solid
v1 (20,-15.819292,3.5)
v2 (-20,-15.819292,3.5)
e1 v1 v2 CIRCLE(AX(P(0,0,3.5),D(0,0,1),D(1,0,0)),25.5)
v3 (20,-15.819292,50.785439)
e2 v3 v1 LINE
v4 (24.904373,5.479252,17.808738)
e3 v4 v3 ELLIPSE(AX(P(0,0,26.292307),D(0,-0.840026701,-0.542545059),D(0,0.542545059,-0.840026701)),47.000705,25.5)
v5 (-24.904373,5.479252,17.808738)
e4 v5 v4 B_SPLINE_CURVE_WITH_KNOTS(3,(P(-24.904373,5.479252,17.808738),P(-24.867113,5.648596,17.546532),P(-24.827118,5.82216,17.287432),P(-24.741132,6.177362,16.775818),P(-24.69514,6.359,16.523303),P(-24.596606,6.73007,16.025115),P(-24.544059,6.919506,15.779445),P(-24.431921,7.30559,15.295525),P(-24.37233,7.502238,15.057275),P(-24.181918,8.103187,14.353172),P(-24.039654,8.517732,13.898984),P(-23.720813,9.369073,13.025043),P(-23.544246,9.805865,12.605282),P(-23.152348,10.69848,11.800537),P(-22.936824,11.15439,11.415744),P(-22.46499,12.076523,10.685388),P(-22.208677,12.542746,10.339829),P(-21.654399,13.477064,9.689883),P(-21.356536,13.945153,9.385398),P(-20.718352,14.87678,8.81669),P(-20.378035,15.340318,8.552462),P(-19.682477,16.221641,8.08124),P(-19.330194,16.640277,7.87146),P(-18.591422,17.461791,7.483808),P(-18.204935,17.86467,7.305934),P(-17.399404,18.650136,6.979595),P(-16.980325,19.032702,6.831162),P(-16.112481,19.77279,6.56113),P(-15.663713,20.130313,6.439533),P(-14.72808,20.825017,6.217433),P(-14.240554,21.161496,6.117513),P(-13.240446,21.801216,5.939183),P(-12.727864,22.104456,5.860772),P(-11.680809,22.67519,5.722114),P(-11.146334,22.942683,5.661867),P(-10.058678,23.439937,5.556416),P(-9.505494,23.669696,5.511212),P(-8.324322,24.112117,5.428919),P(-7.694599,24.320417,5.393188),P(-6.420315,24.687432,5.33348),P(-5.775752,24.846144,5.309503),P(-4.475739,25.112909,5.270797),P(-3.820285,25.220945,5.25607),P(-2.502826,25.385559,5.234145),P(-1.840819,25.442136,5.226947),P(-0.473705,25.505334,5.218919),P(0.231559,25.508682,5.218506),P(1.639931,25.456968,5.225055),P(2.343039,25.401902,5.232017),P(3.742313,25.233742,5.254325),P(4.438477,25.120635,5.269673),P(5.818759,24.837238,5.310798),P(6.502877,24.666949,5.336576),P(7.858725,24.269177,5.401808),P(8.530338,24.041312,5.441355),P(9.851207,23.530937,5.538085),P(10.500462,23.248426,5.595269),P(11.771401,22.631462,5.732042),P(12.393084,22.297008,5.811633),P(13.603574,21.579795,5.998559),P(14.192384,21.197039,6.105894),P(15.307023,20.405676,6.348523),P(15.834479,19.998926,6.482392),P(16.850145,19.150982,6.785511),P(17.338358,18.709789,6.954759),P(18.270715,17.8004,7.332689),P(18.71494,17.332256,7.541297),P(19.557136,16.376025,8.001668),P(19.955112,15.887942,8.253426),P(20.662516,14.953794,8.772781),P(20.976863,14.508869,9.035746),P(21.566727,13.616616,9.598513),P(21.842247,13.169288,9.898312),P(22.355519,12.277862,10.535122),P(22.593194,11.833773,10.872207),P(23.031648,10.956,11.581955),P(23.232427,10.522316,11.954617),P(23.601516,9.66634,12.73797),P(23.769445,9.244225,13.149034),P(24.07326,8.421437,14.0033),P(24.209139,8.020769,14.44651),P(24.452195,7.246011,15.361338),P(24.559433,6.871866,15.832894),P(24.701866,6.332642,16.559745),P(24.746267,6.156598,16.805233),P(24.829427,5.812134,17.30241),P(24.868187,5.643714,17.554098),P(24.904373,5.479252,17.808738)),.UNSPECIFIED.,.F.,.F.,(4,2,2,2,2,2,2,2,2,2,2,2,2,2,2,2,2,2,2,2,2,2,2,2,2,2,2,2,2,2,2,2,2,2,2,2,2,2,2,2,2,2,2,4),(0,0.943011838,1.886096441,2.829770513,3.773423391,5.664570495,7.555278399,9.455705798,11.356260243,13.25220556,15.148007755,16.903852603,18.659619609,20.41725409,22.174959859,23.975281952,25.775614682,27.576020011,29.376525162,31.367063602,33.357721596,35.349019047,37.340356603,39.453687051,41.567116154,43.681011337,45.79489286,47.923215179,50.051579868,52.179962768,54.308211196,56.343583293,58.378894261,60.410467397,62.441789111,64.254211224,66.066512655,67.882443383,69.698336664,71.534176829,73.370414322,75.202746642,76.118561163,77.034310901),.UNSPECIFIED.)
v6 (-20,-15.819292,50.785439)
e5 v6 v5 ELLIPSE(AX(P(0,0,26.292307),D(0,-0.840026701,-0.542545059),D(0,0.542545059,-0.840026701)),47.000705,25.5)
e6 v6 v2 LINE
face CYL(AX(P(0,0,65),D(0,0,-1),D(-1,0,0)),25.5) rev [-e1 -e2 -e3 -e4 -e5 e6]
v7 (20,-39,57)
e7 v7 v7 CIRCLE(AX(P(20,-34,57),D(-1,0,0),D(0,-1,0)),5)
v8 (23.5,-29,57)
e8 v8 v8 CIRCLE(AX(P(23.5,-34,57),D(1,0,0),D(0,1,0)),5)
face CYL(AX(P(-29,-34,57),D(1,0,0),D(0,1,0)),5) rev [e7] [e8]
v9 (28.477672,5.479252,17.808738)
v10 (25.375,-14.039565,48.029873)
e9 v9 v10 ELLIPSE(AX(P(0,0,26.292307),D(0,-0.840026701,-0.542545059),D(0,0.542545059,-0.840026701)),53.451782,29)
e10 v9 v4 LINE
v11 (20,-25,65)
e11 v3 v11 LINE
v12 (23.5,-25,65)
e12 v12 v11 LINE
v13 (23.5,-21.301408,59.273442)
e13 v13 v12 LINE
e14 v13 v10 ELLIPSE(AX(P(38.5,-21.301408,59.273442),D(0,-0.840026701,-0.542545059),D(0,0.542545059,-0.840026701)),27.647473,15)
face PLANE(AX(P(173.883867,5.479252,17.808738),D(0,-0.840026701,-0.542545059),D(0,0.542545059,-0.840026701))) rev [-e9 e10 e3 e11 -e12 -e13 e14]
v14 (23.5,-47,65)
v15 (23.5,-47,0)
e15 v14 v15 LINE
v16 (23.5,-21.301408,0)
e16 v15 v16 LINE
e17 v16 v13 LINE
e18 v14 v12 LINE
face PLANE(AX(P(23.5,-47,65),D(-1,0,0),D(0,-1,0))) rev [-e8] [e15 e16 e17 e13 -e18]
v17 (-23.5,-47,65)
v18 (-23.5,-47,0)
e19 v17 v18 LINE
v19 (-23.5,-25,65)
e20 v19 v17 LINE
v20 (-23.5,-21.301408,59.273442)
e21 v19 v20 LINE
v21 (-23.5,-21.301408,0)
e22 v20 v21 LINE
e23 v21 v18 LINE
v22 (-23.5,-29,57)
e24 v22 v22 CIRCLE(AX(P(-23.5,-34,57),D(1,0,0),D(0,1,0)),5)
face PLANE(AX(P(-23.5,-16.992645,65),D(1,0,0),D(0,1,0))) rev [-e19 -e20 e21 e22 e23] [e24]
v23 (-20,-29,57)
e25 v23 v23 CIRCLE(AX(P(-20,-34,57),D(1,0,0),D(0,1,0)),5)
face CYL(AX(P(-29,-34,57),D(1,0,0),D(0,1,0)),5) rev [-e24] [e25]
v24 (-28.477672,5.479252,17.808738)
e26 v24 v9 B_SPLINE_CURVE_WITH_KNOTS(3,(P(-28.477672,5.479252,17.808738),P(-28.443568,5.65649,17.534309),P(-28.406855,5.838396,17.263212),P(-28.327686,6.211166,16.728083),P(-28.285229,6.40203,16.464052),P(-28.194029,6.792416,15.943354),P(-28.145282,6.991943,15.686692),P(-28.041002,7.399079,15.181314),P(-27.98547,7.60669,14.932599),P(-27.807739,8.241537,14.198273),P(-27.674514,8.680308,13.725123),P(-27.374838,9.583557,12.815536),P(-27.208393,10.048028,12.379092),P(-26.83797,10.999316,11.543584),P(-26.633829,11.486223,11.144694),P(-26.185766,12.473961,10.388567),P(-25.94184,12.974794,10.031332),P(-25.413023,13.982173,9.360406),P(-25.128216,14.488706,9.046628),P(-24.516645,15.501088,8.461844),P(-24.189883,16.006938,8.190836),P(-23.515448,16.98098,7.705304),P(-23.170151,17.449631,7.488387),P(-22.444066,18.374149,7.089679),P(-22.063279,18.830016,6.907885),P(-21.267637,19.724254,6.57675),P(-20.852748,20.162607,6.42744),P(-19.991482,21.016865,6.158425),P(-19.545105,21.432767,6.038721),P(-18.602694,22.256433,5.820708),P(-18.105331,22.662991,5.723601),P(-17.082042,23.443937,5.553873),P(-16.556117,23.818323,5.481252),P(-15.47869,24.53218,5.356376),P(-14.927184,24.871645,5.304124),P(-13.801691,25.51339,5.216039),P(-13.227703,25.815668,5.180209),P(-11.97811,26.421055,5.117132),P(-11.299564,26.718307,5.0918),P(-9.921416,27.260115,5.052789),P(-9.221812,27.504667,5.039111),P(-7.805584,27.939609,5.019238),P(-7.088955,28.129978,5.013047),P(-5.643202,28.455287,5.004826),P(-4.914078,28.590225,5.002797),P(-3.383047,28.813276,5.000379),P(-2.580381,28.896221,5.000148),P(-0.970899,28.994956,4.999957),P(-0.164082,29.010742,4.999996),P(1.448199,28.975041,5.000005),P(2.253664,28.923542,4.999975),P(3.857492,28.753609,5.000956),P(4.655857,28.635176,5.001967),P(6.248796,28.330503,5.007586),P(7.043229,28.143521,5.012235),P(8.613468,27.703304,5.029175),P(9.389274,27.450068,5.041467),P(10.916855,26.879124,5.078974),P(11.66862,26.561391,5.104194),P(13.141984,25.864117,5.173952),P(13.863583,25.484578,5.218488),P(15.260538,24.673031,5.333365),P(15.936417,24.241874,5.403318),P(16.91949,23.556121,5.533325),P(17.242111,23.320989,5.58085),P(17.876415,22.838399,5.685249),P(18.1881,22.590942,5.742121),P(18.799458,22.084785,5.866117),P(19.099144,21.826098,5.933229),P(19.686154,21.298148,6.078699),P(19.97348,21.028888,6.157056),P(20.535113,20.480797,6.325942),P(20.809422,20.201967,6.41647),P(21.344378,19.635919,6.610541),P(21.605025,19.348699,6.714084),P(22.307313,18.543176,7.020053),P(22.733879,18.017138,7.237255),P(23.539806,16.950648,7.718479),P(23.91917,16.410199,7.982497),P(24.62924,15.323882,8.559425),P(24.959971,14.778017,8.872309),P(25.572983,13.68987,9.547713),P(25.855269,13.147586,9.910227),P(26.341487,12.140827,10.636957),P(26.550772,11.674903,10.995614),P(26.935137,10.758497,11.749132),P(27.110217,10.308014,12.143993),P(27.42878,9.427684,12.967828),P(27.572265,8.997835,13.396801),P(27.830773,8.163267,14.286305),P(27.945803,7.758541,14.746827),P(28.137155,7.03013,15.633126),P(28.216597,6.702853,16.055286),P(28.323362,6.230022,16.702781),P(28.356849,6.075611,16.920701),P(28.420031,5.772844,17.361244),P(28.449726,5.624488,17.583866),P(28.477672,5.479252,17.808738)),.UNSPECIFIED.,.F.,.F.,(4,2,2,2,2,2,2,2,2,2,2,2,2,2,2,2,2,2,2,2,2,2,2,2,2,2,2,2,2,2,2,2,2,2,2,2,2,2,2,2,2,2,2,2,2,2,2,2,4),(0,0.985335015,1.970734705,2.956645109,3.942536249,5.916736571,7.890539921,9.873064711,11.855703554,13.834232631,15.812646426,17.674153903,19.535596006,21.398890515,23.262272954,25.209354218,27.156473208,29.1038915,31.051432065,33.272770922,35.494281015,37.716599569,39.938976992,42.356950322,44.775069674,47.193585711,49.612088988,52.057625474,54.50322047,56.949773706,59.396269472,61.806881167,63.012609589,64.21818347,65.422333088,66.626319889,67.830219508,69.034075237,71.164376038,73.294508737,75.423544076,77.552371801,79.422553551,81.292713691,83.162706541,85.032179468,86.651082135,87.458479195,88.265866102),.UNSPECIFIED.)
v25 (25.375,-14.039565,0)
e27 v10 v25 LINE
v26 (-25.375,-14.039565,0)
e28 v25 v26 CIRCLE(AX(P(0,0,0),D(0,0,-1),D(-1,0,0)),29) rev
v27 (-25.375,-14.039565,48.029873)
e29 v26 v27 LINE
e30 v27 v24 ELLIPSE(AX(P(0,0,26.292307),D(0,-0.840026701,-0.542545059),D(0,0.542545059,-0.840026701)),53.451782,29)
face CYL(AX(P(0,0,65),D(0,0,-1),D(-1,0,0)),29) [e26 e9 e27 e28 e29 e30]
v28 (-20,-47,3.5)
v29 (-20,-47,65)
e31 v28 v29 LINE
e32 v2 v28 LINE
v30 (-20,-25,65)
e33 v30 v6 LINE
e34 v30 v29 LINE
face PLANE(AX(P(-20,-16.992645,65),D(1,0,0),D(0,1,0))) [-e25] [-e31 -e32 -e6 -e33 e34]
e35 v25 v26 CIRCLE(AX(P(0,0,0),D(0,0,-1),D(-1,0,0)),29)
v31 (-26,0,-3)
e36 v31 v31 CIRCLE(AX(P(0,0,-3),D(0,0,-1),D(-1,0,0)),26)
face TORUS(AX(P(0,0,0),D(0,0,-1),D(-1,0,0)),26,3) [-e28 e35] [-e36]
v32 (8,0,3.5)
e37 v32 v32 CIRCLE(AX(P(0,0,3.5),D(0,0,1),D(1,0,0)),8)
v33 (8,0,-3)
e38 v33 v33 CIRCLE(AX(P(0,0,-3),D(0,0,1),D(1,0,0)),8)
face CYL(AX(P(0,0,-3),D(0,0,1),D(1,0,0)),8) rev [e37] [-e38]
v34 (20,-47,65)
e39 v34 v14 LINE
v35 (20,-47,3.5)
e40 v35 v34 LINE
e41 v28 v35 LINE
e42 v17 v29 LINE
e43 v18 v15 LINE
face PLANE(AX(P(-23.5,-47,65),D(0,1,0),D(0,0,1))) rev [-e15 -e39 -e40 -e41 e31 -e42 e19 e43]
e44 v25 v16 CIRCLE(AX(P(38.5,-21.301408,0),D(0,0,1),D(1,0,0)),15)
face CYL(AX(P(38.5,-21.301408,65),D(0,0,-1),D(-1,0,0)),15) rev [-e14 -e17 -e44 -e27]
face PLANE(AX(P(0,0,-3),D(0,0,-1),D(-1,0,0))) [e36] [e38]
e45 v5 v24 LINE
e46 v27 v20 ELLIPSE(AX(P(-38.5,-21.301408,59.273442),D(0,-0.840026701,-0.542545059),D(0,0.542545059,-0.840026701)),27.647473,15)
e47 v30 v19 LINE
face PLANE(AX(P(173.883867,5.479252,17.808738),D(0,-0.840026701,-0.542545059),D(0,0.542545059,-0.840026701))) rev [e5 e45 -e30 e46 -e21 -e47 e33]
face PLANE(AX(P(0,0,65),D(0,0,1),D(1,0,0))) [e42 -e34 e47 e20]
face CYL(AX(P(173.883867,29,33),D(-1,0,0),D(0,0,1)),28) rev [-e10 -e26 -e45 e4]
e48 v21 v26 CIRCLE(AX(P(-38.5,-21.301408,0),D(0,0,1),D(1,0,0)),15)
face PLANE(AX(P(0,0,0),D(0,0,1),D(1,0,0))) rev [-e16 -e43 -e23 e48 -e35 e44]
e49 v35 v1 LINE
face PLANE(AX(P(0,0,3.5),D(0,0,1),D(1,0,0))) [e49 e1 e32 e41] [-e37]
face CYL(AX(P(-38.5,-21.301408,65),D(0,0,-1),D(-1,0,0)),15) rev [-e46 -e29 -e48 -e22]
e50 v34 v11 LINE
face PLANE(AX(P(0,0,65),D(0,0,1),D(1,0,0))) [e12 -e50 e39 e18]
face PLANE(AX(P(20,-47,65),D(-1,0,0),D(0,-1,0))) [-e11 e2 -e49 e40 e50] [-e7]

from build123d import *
from build123d.topology import SkipClean

# Parameters (mm, degrees)
EXTRUDE_1_DEPTH          = 65
SHELL_1_T                = -3.5
CUT_EXTRUDE_3_DEPTH      = 86.293611
CUT_EXTRUDE_3_DEPTH_BACK = 86.293611
FILLET_1_R               = 15
SKETCH_3_W               = 40
SKETCH_3_H               = 3.5
CUT_EXTRUDE_4_DEPTH      = 61.5
SKETCH_4_R               = 5
CUT_EXTRUDE_5_DEPTH      = 96.865792
EXTRUDE_START            = 3
SKETCH_5_R               = 29
EXTRUDE_2_DEPTH          = 3
FILLET_2_R               = 3
SKETCH_6_R               = 8
CUT_EXTRUDE_6_DEPTH      = 83.657426


with BuildPart() as part:
    # 草图1 → 凸台-拉伸1 (new body)
    with BuildSketch(Plane.XY):
        with BuildLine():
            Line((-23.5, -16.992645), (-23.5, -47))
            Line((-23.5, -47), (23.5, -47))
            Line((23.5, -47), (23.5, -16.992645))
            ThreePointArc((23.5, -16.992645), (0, 29), (-23.5, -16.992645))
        make_face()
    extrude(amount=EXTRUDE_1_DEPTH)

    # 抽壳1
    shell_1_openings = [part.faces().sort_by_distance(p)[0] for p in [
        (0, -9.973122, 65),
    ]]
    offset(amount=SHELL_1_T, openings=shell_1_openings, kind=Kind.INTERSECTION)

    # 草图2 → 切除-拉伸3 (cut, two sides: drawn at the far end of the back side and taken through both)
    with BuildSketch(Plane(origin=(0, 0, 0), x_dir=(0, 0, -1), z_dir=(1, 0, 0)).offset(-CUT_EXTRUDE_3_DEPTH_BACK)):
        with BuildLine():
            Line((-5, 232.659495), (-5, 29))
            ThreePointArc((-5, 29), (-8.409806, 15.608871), (-17.808738, 5.479252))
            Line((-17.808738, 5.479252), (-65, -25))
            Line((-65, -25), (-236.079414, -135.494453))
            Line((-236.079414, -135.494453), (-581.070507, 81.046318))
            Line((-581.070507, 81.046318), (-349.991093, 449.200266))
            Line((-349.991093, 449.200266), (-5, 232.659495))
        make_face()
    extrude(amount=CUT_EXTRUDE_3_DEPTH + CUT_EXTRUDE_3_DEPTH_BACK, mode=Mode.SUBTRACT)

    # 圆角1
    fillet_1_edges = [part.edges().sort_by_distance(p)[0] for p in [
        (-23.5, -16.992645, 26.301076),
        (23.5, -16.992645, 26.301076),
    ]]
    fillet(fillet_1_edges, radius=FILLET_1_R)

    # 草图3 → 切除-拉伸4 (cut)
    with BuildSketch(Plane.XY.offset(65)):
        with Locations((0, -45.25)):
            Rectangle(SKETCH_3_W, SKETCH_3_H)
    extrude(amount=-CUT_EXTRUDE_4_DEPTH, mode=Mode.SUBTRACT)

    # 草图4 → 切除-拉伸5 (cut, through all)
    with BuildSketch(Plane(origin=(23.5, 0, 0), x_dir=(0, 0, -1), z_dir=(1, 0, 0))):
        with Locations(Location((-57, -34, 0), (0, 0, 90))):
            Circle(SKETCH_4_R)
    extrude(amount=-CUT_EXTRUDE_5_DEPTH, mode=Mode.SUBTRACT)

    # 草图5 → 凸台-拉伸2 (add)
    with SkipClean():  # the faces are left unmerged after this step: merging them gives an invalid solid
        with BuildSketch(Plane(origin=(0, 0, 0), x_dir=(-1, 0, 0), z_dir=(0, 0, -1)).offset(EXTRUDE_START)):
            Circle(SKETCH_5_R)
        extrude(amount=-EXTRUDE_2_DEPTH)

    # 圆角2
    fillet_2_edges = [part.edges().sort_by_distance(p)[0] for p in [
        (29, 0, -3),
    ]]
    fillet(fillet_2_edges, radius=FILLET_2_R - 0.0001)  # a hair under: the kernel refuses the full size

    # 草图6 → 切除-拉伸6 (cut, through all)
    with BuildSketch(Plane.XY.offset(3.5)):
        Circle(SKETCH_6_R)
    extrude(amount=-CUT_EXTRUDE_6_DEPTH, mode=Mode.SUBTRACT)


solid = part.part
